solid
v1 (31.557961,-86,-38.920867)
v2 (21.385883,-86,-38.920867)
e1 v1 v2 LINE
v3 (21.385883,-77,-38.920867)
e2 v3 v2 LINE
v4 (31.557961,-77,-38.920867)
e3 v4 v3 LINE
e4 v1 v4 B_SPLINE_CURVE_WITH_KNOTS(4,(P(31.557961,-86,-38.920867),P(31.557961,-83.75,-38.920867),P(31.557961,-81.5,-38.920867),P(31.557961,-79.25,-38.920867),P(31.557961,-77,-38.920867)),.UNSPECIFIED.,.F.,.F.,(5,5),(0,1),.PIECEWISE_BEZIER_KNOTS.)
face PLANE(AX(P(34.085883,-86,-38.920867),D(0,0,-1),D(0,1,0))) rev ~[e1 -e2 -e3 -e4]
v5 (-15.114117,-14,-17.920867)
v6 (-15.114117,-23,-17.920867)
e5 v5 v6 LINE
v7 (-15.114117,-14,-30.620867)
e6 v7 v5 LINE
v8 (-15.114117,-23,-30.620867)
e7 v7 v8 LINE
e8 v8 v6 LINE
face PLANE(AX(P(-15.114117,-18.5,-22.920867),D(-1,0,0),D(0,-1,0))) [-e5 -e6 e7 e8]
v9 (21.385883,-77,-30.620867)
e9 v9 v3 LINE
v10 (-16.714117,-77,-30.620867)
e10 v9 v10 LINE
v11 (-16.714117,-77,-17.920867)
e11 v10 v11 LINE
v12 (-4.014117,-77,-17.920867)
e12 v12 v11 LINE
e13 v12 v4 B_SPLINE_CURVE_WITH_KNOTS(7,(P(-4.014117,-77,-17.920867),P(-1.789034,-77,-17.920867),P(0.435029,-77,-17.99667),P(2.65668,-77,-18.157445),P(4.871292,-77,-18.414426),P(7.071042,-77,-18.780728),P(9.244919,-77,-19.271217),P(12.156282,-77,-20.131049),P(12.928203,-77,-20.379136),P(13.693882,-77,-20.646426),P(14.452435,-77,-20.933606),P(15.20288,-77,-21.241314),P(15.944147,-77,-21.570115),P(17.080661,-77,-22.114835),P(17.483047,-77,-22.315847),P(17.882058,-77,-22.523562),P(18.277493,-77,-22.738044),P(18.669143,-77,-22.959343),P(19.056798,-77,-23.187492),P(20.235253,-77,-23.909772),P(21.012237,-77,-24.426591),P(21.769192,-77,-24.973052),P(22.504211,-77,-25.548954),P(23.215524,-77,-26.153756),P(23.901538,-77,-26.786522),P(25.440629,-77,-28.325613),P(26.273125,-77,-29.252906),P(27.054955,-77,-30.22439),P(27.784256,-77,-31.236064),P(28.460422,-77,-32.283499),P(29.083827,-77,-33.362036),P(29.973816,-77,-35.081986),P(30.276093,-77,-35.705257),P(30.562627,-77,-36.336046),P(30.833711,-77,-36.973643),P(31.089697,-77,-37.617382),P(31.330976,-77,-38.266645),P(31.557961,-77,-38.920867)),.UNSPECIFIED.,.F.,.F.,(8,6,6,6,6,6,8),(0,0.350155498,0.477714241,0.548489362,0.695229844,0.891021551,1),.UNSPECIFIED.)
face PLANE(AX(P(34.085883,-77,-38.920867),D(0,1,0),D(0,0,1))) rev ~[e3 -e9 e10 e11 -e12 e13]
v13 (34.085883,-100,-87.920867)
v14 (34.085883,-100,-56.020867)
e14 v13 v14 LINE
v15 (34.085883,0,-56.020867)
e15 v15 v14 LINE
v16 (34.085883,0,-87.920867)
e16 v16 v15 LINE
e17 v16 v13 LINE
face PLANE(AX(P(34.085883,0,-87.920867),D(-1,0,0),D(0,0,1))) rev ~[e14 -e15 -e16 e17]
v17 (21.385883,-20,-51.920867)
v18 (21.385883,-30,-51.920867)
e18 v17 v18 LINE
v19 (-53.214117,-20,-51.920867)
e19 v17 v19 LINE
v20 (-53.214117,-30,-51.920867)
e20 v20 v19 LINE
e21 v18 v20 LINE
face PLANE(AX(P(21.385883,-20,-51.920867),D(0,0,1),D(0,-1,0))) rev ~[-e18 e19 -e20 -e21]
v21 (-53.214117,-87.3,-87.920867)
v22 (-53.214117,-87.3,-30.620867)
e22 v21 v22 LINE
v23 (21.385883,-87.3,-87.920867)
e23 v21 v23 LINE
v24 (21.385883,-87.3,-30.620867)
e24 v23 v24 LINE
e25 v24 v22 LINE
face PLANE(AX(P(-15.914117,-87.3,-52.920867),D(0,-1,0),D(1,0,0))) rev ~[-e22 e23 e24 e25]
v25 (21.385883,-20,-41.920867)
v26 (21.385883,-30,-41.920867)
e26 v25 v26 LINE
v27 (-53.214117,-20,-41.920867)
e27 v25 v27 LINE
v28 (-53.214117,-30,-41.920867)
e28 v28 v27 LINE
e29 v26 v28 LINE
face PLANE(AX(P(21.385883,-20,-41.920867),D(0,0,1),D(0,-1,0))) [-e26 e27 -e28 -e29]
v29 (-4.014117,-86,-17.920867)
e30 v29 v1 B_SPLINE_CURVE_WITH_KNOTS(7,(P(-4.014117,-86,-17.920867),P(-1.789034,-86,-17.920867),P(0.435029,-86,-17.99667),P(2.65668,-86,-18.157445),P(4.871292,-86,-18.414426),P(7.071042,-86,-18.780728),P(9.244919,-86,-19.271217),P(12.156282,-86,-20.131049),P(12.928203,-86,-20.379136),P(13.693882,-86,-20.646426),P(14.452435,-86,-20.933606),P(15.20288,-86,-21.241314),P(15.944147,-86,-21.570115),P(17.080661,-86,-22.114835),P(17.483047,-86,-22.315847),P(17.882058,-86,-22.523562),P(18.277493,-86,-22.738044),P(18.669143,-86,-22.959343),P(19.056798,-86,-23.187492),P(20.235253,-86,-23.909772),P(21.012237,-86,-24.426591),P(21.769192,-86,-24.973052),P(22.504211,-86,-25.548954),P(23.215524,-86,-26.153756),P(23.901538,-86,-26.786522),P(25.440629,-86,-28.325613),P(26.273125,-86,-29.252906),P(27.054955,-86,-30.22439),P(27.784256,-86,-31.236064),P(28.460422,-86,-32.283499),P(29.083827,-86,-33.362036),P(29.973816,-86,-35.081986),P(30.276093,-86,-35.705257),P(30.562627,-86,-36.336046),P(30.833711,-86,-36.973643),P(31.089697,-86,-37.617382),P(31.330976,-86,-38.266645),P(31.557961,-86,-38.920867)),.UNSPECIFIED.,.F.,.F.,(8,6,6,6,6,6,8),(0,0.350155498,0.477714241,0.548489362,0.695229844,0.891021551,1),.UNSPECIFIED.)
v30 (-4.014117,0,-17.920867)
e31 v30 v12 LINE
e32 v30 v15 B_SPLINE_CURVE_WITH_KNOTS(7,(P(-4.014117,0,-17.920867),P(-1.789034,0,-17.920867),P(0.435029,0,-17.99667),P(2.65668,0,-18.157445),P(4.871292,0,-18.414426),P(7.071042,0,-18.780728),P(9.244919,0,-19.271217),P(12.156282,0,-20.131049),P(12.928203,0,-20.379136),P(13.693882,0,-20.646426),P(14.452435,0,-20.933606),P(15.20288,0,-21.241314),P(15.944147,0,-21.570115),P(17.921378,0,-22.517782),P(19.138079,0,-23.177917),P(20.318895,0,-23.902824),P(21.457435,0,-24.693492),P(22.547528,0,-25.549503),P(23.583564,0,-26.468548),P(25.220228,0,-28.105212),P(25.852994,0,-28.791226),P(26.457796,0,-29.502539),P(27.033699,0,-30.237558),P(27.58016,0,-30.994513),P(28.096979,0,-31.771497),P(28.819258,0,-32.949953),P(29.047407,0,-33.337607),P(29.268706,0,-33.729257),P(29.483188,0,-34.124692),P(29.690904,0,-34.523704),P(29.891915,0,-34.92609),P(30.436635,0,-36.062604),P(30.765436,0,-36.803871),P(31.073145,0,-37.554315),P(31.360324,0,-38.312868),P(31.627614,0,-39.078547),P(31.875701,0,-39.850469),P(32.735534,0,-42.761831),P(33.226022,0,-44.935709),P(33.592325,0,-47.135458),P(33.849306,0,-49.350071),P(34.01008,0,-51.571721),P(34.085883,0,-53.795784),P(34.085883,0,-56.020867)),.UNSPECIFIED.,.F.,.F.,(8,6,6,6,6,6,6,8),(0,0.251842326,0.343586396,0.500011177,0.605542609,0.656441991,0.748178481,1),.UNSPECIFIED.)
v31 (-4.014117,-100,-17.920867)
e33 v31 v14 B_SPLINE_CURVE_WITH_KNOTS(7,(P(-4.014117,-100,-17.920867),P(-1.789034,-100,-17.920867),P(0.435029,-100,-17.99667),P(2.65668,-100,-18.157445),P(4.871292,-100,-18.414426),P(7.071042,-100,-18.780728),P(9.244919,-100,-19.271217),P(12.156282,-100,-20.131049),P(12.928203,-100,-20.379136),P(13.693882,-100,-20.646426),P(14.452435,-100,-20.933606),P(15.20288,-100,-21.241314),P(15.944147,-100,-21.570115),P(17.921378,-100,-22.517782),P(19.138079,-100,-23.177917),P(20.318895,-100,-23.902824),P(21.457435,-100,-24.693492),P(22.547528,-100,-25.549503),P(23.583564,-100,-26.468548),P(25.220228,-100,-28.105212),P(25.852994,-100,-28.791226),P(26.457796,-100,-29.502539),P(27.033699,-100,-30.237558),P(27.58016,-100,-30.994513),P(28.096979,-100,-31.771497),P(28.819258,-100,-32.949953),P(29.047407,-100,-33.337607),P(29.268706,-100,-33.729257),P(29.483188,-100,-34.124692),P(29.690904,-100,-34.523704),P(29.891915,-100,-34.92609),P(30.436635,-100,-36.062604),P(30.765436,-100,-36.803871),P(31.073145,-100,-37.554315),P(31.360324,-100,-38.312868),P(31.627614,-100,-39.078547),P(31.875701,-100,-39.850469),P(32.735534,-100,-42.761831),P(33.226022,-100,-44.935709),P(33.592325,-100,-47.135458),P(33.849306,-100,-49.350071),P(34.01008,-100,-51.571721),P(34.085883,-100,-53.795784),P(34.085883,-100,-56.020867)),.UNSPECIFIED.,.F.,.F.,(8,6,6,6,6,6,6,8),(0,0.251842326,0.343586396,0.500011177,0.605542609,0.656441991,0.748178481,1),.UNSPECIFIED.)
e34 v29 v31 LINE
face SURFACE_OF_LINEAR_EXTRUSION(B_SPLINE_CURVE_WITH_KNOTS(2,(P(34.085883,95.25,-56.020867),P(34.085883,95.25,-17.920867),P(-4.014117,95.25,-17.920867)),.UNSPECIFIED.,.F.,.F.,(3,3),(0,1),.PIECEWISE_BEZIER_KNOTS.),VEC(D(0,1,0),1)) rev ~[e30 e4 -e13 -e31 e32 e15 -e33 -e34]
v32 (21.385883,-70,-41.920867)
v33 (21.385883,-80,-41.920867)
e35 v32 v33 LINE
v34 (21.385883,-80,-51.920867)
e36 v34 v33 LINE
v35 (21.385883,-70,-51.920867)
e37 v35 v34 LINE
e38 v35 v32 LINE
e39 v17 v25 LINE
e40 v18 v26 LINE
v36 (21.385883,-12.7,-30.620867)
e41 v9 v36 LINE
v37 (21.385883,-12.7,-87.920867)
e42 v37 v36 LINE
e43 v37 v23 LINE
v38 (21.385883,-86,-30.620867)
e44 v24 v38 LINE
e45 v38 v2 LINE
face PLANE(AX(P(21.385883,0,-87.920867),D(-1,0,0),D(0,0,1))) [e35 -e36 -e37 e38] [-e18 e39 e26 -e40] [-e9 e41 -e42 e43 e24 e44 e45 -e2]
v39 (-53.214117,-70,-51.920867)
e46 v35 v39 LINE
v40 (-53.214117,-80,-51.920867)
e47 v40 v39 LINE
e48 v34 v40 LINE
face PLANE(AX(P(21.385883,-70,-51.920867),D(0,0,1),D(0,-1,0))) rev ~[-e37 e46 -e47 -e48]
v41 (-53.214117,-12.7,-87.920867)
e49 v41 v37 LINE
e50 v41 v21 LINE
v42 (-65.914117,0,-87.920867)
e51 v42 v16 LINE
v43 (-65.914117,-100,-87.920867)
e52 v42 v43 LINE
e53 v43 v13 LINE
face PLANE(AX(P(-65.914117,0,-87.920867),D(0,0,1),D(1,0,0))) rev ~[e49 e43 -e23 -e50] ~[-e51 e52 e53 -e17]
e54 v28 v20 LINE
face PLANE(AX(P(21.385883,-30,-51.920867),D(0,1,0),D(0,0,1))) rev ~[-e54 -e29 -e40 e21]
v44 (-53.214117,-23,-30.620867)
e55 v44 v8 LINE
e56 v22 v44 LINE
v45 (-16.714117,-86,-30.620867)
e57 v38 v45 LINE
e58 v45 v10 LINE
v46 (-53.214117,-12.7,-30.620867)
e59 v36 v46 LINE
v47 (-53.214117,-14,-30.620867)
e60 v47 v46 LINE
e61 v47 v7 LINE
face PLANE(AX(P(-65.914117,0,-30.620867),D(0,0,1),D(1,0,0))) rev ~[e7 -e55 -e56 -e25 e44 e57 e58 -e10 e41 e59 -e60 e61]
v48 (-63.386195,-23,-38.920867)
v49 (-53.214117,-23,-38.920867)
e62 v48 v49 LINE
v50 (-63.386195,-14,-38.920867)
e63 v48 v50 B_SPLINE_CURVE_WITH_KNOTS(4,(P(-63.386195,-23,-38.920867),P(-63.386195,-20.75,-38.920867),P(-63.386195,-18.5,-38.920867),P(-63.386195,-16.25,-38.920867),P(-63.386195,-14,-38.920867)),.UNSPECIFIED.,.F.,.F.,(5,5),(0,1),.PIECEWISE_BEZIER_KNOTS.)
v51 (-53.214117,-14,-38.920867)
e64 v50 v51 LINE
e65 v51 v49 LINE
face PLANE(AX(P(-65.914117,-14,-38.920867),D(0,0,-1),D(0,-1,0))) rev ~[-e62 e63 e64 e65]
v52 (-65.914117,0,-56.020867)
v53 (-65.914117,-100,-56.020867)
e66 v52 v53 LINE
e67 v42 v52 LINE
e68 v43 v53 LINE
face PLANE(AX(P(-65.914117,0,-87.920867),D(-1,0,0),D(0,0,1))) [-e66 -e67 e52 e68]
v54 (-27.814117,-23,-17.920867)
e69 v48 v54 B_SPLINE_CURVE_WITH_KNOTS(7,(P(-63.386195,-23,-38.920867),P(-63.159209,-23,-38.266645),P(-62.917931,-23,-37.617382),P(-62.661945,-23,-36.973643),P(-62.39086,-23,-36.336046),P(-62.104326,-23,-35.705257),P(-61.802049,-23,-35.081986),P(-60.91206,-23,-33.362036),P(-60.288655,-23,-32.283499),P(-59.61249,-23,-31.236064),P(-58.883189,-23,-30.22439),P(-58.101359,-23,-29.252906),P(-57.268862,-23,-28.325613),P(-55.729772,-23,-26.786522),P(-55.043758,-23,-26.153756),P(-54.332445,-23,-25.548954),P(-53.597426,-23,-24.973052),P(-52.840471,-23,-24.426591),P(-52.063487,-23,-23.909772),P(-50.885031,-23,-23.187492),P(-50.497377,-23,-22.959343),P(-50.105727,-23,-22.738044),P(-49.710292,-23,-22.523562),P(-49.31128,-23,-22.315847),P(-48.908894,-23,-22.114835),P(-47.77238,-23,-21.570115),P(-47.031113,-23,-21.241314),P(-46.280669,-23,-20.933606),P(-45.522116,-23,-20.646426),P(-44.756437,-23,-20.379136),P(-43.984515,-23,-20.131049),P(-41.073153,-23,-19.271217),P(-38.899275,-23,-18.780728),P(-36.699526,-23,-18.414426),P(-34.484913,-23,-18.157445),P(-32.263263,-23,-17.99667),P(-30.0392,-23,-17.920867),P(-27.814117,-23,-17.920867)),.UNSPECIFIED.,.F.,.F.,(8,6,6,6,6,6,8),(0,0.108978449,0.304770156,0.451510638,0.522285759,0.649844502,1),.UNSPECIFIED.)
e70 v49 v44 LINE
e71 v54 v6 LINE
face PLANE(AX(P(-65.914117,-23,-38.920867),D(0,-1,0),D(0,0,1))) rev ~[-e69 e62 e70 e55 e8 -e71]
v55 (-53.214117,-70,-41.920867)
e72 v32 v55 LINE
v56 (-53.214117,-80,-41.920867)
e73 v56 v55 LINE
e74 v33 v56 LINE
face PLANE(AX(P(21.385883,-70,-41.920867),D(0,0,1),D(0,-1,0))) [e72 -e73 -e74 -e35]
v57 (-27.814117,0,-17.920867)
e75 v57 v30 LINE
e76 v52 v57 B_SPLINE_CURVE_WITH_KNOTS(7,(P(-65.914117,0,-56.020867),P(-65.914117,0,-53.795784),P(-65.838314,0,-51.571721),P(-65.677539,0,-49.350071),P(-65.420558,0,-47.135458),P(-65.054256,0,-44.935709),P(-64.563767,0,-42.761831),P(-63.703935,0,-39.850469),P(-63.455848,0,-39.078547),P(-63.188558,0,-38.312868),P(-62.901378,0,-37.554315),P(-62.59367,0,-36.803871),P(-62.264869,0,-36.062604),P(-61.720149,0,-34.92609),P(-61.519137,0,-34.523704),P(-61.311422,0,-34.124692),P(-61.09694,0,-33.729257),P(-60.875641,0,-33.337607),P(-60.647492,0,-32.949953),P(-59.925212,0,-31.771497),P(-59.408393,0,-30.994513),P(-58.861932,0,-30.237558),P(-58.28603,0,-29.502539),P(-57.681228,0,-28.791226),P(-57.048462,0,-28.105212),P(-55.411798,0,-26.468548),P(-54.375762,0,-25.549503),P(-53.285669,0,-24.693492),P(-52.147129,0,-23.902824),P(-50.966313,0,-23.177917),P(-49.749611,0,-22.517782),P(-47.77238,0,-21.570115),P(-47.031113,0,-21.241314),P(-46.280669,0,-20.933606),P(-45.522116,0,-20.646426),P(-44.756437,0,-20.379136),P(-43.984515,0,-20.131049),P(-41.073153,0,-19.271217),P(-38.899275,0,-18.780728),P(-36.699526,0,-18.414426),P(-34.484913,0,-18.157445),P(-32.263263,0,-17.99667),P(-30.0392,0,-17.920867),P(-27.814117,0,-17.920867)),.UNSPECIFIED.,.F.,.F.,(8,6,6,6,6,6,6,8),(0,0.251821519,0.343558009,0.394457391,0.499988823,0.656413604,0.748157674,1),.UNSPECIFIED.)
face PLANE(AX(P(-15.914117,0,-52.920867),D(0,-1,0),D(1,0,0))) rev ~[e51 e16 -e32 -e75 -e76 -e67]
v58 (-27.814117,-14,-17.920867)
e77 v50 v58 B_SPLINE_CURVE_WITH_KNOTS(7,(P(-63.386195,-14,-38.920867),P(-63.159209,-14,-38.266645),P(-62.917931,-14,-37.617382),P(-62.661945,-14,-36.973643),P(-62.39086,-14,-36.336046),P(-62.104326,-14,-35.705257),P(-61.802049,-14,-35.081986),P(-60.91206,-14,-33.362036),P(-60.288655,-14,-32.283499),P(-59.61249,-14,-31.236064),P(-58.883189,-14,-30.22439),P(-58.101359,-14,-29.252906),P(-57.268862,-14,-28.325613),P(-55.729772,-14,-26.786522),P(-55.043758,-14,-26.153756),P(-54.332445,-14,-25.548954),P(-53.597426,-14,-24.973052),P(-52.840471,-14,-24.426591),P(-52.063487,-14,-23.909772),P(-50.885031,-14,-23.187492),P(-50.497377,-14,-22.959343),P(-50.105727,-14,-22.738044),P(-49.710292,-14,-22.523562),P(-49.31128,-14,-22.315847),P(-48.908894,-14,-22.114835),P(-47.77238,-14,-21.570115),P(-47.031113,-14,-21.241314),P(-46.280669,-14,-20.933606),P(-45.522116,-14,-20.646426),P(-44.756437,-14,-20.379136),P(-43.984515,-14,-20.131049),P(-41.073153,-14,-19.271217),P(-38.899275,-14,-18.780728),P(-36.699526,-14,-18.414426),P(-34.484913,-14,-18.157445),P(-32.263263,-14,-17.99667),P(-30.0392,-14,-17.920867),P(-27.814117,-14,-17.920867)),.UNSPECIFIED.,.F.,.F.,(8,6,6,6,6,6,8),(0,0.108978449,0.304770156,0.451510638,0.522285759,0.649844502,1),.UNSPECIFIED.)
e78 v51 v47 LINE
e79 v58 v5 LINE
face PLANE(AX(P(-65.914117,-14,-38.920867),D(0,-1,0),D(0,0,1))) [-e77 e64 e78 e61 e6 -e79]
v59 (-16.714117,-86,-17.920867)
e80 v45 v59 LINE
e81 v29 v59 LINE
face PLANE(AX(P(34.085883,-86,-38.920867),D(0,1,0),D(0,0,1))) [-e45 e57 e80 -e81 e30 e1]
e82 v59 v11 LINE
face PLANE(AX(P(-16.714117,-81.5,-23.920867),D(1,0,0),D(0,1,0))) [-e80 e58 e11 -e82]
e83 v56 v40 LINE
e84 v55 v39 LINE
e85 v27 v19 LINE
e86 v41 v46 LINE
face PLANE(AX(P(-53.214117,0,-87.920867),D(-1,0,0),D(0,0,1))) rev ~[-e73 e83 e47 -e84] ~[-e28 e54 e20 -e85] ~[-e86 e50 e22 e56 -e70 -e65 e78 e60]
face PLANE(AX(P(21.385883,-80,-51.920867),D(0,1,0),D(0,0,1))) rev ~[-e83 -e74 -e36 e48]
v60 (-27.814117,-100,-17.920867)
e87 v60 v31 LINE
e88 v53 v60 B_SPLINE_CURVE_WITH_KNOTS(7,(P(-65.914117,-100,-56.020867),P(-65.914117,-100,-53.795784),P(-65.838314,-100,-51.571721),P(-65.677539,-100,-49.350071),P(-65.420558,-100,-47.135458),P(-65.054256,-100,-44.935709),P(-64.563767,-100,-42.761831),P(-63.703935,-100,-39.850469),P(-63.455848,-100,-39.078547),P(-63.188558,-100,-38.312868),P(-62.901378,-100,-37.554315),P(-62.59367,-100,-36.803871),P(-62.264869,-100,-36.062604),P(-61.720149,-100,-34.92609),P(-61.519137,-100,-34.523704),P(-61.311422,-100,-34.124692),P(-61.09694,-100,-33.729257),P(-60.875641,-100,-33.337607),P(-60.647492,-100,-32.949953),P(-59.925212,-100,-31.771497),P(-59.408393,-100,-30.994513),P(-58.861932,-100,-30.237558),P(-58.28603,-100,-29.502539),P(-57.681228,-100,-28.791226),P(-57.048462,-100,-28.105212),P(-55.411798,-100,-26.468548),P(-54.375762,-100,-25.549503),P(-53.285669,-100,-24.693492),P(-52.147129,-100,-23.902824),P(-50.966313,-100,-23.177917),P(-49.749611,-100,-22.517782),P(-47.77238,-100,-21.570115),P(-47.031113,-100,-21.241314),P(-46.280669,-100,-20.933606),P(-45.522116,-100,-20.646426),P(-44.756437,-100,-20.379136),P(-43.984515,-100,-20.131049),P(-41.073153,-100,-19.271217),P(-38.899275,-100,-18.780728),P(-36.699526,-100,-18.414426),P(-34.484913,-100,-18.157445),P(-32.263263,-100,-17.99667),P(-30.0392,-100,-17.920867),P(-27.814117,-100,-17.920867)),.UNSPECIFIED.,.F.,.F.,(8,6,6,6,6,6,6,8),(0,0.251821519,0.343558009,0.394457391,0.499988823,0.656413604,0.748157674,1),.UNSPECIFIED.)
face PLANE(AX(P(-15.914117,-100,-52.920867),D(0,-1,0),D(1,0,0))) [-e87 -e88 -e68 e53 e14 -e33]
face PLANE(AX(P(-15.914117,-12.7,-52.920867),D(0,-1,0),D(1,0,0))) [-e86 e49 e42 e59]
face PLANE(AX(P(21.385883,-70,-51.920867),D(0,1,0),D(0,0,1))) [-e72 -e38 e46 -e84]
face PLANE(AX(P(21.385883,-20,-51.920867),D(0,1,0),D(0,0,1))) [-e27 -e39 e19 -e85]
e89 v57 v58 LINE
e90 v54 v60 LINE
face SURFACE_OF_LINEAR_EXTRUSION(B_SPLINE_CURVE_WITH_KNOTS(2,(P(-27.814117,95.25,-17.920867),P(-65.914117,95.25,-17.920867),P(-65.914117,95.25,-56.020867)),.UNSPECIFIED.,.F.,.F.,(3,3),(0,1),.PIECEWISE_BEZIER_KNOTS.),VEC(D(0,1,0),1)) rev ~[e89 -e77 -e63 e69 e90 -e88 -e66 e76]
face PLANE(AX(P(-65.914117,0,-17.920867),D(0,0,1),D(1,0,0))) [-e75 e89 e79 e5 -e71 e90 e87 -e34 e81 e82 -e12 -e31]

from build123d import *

# Parameters (mm, degrees)
F0_W        = 100
F0_H        = 70
F1_DEPTH    = 100
F2_T        = -12.7
F3_T1_DEPTH = 290.5
F4_T1_DEPTH = 290.5
F5_W        = 9
F5_H        = 32
F6_DEPTH    = 50.8
F7_W        = 9
F7_H        = 30
F8_DEPTH    = 50.8
F9_W        = 10
F9_H        = 10
F12_DEPTH   = 83.82


# Not quite as in the source:
# - a fillet or chamfer that OpenCascade refuses, or shapes differently, is made with other operations: its cross-section is extruded or revolved along the edge and cut away or added
# - a feature of the source that left no trace in its solid (it failed there, or was rolled back) is left out


with BuildPart() as f1:
    # F0 (on Front) → F1 (new body)
    with BuildSketch(Plane.XZ):
        with Locations((-15.9141167998, -52.9208671927)):
            Rectangle(F0_W, F0_H)
    extrude(amount=F1_DEPTH)

    # F2
    f2_openings = [f1.faces().sort_by_distance(p)[0] for p in [
        (-15.914117, -50, -87.920867),
    ]]
    offset(amount=F2_T, openings=f2_openings)

    # F3: fillet of radius 38.1 on 1 edges, made by hand

    # F3_s2 → F3_t1 (cut)
    with BuildSketch(Plane.XZ.offset(-95.25)):
        with BuildLine():
            add(Edge.make_bspline(
                [(34.0858832002, -56.0208671927), (34.0858832002, -17.9208671927), (-4.0141167998, -17.9208671927)],
                knots=[0, 0, 0, 1, 1, 1], degree=2, weights=[1, 1, 1]))
            Line((-4.0141167998, -17.9208671927), (34.0858832002, -17.9208671927))
            Line((34.0858832002, -17.9208671927), (34.0858832002, -56.0208671927))
        make_face()
    extrude(amount=F3_T1_DEPTH, mode=Mode.SUBTRACT)

    # F4: fillet of radius 38.1 on 1 edges, made by hand

    # F4_s2 → F4_t1 (cut)
    with BuildSketch(Plane.XZ.offset(-95.25)):
        with BuildLine():
            add(Edge.make_bspline(
                [(-27.8141167998, -17.9208671927), (-65.9141167998, -17.9208671927), (-65.9141167998, -56.0208671927)],
                knots=[0, 0, 0, 1, 1, 1], degree=2, weights=[1, 1, 1]))
            Line((-65.9141167998, -56.0208671927), (-65.9141167998, -17.9208671927))
            Line((-65.9141167998, -17.9208671927), (-27.8141167998, -17.9208671927))
        make_face()
    extrude(amount=F4_T1_DEPTH, mode=Mode.SUBTRACT)

    # F5 (on face) → F6 (cut)
    with BuildSketch(Plane(origin=(-65.9141167998, 0, 0), x_dir=(0, -1, 0), z_dir=(-1, 0, 0))):
        with Locations((18.5, -22.9208671927)):
            Rectangle(F5_W, F5_H)
    extrude(amount=-F6_DEPTH, mode=Mode.SUBTRACT)

    # F7 (on face) → F8 (cut)
    with BuildSketch(Plane.YZ.offset(34.0858832002)):
        with Locations((-81.5, -23.9208671927)):
            Rectangle(F7_W, F7_H)
    extrude(amount=-F8_DEPTH, mode=Mode.SUBTRACT)

    # F9 (on face) → F12 (join)
    with BuildSketch(Plane(origin=(21.3858832002, 0, 0), x_dir=(0, -1, 0), z_dir=(-1, 0, 0))):
        with Locations((25, -46.9208671927)):
            Rectangle(F9_W, F9_H)
        with Locations((75, -46.9208671927)):
            Rectangle(F9_W, F9_H)
    extrude(amount=F12_DEPTH)


solid = f1.part
